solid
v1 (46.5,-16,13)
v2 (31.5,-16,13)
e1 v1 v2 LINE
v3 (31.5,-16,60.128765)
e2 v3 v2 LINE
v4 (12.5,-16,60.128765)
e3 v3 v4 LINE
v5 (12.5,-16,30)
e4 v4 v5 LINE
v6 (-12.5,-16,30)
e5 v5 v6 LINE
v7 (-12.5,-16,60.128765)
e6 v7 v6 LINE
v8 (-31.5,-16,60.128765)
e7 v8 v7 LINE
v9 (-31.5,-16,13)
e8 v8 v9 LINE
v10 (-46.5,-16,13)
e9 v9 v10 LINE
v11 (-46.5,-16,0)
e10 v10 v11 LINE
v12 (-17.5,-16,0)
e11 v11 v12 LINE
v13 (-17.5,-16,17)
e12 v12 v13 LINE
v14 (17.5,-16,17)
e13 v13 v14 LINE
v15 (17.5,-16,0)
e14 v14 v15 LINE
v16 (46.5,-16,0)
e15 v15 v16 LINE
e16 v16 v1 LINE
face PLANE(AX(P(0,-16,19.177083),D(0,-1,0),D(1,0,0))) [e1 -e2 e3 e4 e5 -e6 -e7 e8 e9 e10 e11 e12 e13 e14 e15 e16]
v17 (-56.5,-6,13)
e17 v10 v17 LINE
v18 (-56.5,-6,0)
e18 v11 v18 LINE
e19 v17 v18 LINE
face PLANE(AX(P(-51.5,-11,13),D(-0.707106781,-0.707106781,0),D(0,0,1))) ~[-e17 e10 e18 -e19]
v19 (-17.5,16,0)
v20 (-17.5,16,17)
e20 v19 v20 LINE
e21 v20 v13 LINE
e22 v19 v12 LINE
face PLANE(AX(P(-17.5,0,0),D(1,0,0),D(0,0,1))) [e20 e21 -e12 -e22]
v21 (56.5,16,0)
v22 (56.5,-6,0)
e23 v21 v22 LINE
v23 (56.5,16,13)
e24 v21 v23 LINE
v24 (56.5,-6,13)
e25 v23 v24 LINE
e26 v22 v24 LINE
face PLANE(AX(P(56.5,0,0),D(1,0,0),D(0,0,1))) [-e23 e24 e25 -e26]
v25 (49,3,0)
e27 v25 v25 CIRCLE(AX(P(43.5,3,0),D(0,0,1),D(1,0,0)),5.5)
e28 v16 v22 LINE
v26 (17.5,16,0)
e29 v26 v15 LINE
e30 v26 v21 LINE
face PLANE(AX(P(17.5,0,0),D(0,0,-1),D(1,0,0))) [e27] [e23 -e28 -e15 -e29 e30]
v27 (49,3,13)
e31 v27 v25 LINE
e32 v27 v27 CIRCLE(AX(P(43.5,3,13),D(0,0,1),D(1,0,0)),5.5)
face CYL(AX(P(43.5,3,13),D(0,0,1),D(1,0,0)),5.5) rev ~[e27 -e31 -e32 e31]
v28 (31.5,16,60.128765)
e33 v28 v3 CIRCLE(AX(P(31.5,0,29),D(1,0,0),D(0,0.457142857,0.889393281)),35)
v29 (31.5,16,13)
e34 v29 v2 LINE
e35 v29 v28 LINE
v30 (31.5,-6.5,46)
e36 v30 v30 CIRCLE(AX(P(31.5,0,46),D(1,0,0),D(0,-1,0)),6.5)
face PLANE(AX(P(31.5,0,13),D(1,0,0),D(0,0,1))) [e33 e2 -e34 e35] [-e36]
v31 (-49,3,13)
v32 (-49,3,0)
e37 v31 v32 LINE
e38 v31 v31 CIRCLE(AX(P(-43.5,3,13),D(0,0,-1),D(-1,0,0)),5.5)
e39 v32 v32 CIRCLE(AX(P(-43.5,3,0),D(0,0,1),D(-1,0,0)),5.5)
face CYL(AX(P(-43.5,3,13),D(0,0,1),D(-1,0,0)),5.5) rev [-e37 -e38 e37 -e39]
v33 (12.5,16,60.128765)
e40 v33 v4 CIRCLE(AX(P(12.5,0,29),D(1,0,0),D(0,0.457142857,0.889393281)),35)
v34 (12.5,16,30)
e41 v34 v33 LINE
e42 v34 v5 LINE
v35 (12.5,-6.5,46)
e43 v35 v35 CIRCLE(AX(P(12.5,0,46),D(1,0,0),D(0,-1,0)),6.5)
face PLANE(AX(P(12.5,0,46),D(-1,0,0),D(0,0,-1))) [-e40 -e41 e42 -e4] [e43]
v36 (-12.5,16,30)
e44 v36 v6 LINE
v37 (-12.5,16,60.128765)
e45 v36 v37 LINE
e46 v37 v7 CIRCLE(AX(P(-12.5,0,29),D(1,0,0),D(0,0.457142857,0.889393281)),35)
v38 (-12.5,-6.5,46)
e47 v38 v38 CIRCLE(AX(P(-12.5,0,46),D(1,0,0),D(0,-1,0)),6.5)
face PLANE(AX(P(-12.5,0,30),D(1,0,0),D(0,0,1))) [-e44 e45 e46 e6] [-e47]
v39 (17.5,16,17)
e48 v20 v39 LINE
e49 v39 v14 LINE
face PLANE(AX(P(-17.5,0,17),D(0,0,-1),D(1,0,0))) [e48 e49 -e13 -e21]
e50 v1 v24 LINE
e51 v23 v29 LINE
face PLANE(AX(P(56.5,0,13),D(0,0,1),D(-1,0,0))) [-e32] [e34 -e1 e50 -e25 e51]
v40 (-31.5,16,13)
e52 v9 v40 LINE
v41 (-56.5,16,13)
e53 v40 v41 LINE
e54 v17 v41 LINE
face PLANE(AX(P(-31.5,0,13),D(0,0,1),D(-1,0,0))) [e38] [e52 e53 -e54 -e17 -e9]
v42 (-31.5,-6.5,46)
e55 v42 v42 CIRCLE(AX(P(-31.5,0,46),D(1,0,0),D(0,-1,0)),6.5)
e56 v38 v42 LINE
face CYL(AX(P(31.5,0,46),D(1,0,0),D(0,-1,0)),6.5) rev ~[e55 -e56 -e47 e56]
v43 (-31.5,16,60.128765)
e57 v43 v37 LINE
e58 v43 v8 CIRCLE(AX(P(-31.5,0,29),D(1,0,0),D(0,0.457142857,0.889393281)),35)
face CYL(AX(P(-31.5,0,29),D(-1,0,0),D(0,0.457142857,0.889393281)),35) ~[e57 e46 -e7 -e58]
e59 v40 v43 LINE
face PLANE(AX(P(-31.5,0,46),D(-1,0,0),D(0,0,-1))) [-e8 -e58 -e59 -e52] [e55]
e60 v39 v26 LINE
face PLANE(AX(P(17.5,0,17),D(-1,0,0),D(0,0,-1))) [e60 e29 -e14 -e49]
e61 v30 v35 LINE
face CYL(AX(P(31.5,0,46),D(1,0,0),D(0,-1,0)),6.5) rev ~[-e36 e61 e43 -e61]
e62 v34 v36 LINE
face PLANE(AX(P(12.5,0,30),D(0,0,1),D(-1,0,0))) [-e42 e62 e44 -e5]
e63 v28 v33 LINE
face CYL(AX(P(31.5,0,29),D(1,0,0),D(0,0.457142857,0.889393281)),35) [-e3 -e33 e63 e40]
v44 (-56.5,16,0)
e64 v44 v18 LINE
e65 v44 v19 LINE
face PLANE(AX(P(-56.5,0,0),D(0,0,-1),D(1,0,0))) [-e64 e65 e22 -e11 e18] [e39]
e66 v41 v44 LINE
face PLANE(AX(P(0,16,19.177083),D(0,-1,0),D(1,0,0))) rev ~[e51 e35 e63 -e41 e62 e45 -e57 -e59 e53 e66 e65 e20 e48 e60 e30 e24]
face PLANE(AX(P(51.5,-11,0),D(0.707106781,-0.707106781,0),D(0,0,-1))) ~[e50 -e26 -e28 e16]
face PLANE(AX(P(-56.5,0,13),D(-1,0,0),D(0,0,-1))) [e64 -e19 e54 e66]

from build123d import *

# Parameters (mm, degrees)
F1_DEPTH = 16
F3_DEPTH = 19
F4_DEPTH = 88.001
F5_SIZE  = 10
F6_R     = 5.5
F7_DEPTH = 13.001


# Not quite as in the source:
# - a pattern or mirror of a feature is missing from the dataset's text; its kind, count and spacing are read off the source's solid


with BuildPart() as f1:
    # F0 (on Front) → F1 (new body, symmetric)
    with BuildSketch(Plane.XZ):
        Polygon((-56.5, 13), (-56.5, 0), (-17.5, 0), (-17.5, 17), (0, 17), (17.5, 17), (17.5, 0), (56.5, 0), (56.5, 13), (31.5, 13), (31.5, 46), (12.5, 46), (12.5, 30), (0, 30), (-12.5, 30), (-12.5, 46), (-31.5, 46), (-31.5, 13), align=None)
    extrude(amount=F1_DEPTH, both=True)

    # F2 (on face) → F3 (join)
    with BuildSketch(Plane.YZ.offset(31.5)):
        with BuildLine():
            ThreePointArc((-6.5, 46), (0, 39.5), (6.5, 46))
            ThreePointArc((6.5, 46), (0, 52.5), (-6.5, 46))
        make_face()
        with BuildLine():
            ThreePointArc((-6.5, 46), (0, 52.5), (6.5, 46))
            Line((6.5, 46), (16, 46))
            Line((16, 46), (16, 60.1287648325))
            ThreePointArc((16, 60.1287648325), (0, 64), (-16, 60.1287648325))
            Line((-16, 60.1287648325), (-16, 46))
            Line((-16, 46), (-6.5, 46))
        make_face()
    f3 = extrude(amount=-F3_DEPTH)

    # F3_copies: F3 across plane
    add(f3.mirror(Plane(origin=(0, 0, 0), x_dir=(0, 0, -1), z_dir=(-1, 0, 0))))

    # F2 (on face) → F4 (cut, through all)
    with BuildSketch(Plane.YZ.offset(31.5)):
        with BuildLine():
            Line((-6.5, 46), (6.5, 46))
            ThreePointArc((6.5, 46), (0, 52.5), (-6.5, 46))
        make_face()
        with BuildLine():
            ThreePointArc((-6.5, 46), (0, 39.5), (6.5, 46))
            Line((6.5, 46), (-6.5, 46))
        make_face()
    extrude(amount=-F4_DEPTH, mode=Mode.SUBTRACT)

    # F5
    f5_edges = [f1.edges().sort_by_distance(p)[0] for p in [
        (56.5, -16, 6.5),
        (-56.5, -16, 6.5),
    ]]
    chamfer(f5_edges, length=F5_SIZE)

    # F6 (on face) → F7 (cut, through all)
    with BuildSketch(Plane.XY.offset(13)):
        with Locations((43.5, 3)):
            Circle(F6_R)
    f7 = extrude(amount=-F7_DEPTH, mode=Mode.SUBTRACT)

    # F7_copies: F7 across plane
    add(f7.mirror(Plane(origin=(0, 0, 0), x_dir=(0, 0, -1), z_dir=(-1, 0, 0))), mode=Mode.SUBTRACT)


solid = f1.part
